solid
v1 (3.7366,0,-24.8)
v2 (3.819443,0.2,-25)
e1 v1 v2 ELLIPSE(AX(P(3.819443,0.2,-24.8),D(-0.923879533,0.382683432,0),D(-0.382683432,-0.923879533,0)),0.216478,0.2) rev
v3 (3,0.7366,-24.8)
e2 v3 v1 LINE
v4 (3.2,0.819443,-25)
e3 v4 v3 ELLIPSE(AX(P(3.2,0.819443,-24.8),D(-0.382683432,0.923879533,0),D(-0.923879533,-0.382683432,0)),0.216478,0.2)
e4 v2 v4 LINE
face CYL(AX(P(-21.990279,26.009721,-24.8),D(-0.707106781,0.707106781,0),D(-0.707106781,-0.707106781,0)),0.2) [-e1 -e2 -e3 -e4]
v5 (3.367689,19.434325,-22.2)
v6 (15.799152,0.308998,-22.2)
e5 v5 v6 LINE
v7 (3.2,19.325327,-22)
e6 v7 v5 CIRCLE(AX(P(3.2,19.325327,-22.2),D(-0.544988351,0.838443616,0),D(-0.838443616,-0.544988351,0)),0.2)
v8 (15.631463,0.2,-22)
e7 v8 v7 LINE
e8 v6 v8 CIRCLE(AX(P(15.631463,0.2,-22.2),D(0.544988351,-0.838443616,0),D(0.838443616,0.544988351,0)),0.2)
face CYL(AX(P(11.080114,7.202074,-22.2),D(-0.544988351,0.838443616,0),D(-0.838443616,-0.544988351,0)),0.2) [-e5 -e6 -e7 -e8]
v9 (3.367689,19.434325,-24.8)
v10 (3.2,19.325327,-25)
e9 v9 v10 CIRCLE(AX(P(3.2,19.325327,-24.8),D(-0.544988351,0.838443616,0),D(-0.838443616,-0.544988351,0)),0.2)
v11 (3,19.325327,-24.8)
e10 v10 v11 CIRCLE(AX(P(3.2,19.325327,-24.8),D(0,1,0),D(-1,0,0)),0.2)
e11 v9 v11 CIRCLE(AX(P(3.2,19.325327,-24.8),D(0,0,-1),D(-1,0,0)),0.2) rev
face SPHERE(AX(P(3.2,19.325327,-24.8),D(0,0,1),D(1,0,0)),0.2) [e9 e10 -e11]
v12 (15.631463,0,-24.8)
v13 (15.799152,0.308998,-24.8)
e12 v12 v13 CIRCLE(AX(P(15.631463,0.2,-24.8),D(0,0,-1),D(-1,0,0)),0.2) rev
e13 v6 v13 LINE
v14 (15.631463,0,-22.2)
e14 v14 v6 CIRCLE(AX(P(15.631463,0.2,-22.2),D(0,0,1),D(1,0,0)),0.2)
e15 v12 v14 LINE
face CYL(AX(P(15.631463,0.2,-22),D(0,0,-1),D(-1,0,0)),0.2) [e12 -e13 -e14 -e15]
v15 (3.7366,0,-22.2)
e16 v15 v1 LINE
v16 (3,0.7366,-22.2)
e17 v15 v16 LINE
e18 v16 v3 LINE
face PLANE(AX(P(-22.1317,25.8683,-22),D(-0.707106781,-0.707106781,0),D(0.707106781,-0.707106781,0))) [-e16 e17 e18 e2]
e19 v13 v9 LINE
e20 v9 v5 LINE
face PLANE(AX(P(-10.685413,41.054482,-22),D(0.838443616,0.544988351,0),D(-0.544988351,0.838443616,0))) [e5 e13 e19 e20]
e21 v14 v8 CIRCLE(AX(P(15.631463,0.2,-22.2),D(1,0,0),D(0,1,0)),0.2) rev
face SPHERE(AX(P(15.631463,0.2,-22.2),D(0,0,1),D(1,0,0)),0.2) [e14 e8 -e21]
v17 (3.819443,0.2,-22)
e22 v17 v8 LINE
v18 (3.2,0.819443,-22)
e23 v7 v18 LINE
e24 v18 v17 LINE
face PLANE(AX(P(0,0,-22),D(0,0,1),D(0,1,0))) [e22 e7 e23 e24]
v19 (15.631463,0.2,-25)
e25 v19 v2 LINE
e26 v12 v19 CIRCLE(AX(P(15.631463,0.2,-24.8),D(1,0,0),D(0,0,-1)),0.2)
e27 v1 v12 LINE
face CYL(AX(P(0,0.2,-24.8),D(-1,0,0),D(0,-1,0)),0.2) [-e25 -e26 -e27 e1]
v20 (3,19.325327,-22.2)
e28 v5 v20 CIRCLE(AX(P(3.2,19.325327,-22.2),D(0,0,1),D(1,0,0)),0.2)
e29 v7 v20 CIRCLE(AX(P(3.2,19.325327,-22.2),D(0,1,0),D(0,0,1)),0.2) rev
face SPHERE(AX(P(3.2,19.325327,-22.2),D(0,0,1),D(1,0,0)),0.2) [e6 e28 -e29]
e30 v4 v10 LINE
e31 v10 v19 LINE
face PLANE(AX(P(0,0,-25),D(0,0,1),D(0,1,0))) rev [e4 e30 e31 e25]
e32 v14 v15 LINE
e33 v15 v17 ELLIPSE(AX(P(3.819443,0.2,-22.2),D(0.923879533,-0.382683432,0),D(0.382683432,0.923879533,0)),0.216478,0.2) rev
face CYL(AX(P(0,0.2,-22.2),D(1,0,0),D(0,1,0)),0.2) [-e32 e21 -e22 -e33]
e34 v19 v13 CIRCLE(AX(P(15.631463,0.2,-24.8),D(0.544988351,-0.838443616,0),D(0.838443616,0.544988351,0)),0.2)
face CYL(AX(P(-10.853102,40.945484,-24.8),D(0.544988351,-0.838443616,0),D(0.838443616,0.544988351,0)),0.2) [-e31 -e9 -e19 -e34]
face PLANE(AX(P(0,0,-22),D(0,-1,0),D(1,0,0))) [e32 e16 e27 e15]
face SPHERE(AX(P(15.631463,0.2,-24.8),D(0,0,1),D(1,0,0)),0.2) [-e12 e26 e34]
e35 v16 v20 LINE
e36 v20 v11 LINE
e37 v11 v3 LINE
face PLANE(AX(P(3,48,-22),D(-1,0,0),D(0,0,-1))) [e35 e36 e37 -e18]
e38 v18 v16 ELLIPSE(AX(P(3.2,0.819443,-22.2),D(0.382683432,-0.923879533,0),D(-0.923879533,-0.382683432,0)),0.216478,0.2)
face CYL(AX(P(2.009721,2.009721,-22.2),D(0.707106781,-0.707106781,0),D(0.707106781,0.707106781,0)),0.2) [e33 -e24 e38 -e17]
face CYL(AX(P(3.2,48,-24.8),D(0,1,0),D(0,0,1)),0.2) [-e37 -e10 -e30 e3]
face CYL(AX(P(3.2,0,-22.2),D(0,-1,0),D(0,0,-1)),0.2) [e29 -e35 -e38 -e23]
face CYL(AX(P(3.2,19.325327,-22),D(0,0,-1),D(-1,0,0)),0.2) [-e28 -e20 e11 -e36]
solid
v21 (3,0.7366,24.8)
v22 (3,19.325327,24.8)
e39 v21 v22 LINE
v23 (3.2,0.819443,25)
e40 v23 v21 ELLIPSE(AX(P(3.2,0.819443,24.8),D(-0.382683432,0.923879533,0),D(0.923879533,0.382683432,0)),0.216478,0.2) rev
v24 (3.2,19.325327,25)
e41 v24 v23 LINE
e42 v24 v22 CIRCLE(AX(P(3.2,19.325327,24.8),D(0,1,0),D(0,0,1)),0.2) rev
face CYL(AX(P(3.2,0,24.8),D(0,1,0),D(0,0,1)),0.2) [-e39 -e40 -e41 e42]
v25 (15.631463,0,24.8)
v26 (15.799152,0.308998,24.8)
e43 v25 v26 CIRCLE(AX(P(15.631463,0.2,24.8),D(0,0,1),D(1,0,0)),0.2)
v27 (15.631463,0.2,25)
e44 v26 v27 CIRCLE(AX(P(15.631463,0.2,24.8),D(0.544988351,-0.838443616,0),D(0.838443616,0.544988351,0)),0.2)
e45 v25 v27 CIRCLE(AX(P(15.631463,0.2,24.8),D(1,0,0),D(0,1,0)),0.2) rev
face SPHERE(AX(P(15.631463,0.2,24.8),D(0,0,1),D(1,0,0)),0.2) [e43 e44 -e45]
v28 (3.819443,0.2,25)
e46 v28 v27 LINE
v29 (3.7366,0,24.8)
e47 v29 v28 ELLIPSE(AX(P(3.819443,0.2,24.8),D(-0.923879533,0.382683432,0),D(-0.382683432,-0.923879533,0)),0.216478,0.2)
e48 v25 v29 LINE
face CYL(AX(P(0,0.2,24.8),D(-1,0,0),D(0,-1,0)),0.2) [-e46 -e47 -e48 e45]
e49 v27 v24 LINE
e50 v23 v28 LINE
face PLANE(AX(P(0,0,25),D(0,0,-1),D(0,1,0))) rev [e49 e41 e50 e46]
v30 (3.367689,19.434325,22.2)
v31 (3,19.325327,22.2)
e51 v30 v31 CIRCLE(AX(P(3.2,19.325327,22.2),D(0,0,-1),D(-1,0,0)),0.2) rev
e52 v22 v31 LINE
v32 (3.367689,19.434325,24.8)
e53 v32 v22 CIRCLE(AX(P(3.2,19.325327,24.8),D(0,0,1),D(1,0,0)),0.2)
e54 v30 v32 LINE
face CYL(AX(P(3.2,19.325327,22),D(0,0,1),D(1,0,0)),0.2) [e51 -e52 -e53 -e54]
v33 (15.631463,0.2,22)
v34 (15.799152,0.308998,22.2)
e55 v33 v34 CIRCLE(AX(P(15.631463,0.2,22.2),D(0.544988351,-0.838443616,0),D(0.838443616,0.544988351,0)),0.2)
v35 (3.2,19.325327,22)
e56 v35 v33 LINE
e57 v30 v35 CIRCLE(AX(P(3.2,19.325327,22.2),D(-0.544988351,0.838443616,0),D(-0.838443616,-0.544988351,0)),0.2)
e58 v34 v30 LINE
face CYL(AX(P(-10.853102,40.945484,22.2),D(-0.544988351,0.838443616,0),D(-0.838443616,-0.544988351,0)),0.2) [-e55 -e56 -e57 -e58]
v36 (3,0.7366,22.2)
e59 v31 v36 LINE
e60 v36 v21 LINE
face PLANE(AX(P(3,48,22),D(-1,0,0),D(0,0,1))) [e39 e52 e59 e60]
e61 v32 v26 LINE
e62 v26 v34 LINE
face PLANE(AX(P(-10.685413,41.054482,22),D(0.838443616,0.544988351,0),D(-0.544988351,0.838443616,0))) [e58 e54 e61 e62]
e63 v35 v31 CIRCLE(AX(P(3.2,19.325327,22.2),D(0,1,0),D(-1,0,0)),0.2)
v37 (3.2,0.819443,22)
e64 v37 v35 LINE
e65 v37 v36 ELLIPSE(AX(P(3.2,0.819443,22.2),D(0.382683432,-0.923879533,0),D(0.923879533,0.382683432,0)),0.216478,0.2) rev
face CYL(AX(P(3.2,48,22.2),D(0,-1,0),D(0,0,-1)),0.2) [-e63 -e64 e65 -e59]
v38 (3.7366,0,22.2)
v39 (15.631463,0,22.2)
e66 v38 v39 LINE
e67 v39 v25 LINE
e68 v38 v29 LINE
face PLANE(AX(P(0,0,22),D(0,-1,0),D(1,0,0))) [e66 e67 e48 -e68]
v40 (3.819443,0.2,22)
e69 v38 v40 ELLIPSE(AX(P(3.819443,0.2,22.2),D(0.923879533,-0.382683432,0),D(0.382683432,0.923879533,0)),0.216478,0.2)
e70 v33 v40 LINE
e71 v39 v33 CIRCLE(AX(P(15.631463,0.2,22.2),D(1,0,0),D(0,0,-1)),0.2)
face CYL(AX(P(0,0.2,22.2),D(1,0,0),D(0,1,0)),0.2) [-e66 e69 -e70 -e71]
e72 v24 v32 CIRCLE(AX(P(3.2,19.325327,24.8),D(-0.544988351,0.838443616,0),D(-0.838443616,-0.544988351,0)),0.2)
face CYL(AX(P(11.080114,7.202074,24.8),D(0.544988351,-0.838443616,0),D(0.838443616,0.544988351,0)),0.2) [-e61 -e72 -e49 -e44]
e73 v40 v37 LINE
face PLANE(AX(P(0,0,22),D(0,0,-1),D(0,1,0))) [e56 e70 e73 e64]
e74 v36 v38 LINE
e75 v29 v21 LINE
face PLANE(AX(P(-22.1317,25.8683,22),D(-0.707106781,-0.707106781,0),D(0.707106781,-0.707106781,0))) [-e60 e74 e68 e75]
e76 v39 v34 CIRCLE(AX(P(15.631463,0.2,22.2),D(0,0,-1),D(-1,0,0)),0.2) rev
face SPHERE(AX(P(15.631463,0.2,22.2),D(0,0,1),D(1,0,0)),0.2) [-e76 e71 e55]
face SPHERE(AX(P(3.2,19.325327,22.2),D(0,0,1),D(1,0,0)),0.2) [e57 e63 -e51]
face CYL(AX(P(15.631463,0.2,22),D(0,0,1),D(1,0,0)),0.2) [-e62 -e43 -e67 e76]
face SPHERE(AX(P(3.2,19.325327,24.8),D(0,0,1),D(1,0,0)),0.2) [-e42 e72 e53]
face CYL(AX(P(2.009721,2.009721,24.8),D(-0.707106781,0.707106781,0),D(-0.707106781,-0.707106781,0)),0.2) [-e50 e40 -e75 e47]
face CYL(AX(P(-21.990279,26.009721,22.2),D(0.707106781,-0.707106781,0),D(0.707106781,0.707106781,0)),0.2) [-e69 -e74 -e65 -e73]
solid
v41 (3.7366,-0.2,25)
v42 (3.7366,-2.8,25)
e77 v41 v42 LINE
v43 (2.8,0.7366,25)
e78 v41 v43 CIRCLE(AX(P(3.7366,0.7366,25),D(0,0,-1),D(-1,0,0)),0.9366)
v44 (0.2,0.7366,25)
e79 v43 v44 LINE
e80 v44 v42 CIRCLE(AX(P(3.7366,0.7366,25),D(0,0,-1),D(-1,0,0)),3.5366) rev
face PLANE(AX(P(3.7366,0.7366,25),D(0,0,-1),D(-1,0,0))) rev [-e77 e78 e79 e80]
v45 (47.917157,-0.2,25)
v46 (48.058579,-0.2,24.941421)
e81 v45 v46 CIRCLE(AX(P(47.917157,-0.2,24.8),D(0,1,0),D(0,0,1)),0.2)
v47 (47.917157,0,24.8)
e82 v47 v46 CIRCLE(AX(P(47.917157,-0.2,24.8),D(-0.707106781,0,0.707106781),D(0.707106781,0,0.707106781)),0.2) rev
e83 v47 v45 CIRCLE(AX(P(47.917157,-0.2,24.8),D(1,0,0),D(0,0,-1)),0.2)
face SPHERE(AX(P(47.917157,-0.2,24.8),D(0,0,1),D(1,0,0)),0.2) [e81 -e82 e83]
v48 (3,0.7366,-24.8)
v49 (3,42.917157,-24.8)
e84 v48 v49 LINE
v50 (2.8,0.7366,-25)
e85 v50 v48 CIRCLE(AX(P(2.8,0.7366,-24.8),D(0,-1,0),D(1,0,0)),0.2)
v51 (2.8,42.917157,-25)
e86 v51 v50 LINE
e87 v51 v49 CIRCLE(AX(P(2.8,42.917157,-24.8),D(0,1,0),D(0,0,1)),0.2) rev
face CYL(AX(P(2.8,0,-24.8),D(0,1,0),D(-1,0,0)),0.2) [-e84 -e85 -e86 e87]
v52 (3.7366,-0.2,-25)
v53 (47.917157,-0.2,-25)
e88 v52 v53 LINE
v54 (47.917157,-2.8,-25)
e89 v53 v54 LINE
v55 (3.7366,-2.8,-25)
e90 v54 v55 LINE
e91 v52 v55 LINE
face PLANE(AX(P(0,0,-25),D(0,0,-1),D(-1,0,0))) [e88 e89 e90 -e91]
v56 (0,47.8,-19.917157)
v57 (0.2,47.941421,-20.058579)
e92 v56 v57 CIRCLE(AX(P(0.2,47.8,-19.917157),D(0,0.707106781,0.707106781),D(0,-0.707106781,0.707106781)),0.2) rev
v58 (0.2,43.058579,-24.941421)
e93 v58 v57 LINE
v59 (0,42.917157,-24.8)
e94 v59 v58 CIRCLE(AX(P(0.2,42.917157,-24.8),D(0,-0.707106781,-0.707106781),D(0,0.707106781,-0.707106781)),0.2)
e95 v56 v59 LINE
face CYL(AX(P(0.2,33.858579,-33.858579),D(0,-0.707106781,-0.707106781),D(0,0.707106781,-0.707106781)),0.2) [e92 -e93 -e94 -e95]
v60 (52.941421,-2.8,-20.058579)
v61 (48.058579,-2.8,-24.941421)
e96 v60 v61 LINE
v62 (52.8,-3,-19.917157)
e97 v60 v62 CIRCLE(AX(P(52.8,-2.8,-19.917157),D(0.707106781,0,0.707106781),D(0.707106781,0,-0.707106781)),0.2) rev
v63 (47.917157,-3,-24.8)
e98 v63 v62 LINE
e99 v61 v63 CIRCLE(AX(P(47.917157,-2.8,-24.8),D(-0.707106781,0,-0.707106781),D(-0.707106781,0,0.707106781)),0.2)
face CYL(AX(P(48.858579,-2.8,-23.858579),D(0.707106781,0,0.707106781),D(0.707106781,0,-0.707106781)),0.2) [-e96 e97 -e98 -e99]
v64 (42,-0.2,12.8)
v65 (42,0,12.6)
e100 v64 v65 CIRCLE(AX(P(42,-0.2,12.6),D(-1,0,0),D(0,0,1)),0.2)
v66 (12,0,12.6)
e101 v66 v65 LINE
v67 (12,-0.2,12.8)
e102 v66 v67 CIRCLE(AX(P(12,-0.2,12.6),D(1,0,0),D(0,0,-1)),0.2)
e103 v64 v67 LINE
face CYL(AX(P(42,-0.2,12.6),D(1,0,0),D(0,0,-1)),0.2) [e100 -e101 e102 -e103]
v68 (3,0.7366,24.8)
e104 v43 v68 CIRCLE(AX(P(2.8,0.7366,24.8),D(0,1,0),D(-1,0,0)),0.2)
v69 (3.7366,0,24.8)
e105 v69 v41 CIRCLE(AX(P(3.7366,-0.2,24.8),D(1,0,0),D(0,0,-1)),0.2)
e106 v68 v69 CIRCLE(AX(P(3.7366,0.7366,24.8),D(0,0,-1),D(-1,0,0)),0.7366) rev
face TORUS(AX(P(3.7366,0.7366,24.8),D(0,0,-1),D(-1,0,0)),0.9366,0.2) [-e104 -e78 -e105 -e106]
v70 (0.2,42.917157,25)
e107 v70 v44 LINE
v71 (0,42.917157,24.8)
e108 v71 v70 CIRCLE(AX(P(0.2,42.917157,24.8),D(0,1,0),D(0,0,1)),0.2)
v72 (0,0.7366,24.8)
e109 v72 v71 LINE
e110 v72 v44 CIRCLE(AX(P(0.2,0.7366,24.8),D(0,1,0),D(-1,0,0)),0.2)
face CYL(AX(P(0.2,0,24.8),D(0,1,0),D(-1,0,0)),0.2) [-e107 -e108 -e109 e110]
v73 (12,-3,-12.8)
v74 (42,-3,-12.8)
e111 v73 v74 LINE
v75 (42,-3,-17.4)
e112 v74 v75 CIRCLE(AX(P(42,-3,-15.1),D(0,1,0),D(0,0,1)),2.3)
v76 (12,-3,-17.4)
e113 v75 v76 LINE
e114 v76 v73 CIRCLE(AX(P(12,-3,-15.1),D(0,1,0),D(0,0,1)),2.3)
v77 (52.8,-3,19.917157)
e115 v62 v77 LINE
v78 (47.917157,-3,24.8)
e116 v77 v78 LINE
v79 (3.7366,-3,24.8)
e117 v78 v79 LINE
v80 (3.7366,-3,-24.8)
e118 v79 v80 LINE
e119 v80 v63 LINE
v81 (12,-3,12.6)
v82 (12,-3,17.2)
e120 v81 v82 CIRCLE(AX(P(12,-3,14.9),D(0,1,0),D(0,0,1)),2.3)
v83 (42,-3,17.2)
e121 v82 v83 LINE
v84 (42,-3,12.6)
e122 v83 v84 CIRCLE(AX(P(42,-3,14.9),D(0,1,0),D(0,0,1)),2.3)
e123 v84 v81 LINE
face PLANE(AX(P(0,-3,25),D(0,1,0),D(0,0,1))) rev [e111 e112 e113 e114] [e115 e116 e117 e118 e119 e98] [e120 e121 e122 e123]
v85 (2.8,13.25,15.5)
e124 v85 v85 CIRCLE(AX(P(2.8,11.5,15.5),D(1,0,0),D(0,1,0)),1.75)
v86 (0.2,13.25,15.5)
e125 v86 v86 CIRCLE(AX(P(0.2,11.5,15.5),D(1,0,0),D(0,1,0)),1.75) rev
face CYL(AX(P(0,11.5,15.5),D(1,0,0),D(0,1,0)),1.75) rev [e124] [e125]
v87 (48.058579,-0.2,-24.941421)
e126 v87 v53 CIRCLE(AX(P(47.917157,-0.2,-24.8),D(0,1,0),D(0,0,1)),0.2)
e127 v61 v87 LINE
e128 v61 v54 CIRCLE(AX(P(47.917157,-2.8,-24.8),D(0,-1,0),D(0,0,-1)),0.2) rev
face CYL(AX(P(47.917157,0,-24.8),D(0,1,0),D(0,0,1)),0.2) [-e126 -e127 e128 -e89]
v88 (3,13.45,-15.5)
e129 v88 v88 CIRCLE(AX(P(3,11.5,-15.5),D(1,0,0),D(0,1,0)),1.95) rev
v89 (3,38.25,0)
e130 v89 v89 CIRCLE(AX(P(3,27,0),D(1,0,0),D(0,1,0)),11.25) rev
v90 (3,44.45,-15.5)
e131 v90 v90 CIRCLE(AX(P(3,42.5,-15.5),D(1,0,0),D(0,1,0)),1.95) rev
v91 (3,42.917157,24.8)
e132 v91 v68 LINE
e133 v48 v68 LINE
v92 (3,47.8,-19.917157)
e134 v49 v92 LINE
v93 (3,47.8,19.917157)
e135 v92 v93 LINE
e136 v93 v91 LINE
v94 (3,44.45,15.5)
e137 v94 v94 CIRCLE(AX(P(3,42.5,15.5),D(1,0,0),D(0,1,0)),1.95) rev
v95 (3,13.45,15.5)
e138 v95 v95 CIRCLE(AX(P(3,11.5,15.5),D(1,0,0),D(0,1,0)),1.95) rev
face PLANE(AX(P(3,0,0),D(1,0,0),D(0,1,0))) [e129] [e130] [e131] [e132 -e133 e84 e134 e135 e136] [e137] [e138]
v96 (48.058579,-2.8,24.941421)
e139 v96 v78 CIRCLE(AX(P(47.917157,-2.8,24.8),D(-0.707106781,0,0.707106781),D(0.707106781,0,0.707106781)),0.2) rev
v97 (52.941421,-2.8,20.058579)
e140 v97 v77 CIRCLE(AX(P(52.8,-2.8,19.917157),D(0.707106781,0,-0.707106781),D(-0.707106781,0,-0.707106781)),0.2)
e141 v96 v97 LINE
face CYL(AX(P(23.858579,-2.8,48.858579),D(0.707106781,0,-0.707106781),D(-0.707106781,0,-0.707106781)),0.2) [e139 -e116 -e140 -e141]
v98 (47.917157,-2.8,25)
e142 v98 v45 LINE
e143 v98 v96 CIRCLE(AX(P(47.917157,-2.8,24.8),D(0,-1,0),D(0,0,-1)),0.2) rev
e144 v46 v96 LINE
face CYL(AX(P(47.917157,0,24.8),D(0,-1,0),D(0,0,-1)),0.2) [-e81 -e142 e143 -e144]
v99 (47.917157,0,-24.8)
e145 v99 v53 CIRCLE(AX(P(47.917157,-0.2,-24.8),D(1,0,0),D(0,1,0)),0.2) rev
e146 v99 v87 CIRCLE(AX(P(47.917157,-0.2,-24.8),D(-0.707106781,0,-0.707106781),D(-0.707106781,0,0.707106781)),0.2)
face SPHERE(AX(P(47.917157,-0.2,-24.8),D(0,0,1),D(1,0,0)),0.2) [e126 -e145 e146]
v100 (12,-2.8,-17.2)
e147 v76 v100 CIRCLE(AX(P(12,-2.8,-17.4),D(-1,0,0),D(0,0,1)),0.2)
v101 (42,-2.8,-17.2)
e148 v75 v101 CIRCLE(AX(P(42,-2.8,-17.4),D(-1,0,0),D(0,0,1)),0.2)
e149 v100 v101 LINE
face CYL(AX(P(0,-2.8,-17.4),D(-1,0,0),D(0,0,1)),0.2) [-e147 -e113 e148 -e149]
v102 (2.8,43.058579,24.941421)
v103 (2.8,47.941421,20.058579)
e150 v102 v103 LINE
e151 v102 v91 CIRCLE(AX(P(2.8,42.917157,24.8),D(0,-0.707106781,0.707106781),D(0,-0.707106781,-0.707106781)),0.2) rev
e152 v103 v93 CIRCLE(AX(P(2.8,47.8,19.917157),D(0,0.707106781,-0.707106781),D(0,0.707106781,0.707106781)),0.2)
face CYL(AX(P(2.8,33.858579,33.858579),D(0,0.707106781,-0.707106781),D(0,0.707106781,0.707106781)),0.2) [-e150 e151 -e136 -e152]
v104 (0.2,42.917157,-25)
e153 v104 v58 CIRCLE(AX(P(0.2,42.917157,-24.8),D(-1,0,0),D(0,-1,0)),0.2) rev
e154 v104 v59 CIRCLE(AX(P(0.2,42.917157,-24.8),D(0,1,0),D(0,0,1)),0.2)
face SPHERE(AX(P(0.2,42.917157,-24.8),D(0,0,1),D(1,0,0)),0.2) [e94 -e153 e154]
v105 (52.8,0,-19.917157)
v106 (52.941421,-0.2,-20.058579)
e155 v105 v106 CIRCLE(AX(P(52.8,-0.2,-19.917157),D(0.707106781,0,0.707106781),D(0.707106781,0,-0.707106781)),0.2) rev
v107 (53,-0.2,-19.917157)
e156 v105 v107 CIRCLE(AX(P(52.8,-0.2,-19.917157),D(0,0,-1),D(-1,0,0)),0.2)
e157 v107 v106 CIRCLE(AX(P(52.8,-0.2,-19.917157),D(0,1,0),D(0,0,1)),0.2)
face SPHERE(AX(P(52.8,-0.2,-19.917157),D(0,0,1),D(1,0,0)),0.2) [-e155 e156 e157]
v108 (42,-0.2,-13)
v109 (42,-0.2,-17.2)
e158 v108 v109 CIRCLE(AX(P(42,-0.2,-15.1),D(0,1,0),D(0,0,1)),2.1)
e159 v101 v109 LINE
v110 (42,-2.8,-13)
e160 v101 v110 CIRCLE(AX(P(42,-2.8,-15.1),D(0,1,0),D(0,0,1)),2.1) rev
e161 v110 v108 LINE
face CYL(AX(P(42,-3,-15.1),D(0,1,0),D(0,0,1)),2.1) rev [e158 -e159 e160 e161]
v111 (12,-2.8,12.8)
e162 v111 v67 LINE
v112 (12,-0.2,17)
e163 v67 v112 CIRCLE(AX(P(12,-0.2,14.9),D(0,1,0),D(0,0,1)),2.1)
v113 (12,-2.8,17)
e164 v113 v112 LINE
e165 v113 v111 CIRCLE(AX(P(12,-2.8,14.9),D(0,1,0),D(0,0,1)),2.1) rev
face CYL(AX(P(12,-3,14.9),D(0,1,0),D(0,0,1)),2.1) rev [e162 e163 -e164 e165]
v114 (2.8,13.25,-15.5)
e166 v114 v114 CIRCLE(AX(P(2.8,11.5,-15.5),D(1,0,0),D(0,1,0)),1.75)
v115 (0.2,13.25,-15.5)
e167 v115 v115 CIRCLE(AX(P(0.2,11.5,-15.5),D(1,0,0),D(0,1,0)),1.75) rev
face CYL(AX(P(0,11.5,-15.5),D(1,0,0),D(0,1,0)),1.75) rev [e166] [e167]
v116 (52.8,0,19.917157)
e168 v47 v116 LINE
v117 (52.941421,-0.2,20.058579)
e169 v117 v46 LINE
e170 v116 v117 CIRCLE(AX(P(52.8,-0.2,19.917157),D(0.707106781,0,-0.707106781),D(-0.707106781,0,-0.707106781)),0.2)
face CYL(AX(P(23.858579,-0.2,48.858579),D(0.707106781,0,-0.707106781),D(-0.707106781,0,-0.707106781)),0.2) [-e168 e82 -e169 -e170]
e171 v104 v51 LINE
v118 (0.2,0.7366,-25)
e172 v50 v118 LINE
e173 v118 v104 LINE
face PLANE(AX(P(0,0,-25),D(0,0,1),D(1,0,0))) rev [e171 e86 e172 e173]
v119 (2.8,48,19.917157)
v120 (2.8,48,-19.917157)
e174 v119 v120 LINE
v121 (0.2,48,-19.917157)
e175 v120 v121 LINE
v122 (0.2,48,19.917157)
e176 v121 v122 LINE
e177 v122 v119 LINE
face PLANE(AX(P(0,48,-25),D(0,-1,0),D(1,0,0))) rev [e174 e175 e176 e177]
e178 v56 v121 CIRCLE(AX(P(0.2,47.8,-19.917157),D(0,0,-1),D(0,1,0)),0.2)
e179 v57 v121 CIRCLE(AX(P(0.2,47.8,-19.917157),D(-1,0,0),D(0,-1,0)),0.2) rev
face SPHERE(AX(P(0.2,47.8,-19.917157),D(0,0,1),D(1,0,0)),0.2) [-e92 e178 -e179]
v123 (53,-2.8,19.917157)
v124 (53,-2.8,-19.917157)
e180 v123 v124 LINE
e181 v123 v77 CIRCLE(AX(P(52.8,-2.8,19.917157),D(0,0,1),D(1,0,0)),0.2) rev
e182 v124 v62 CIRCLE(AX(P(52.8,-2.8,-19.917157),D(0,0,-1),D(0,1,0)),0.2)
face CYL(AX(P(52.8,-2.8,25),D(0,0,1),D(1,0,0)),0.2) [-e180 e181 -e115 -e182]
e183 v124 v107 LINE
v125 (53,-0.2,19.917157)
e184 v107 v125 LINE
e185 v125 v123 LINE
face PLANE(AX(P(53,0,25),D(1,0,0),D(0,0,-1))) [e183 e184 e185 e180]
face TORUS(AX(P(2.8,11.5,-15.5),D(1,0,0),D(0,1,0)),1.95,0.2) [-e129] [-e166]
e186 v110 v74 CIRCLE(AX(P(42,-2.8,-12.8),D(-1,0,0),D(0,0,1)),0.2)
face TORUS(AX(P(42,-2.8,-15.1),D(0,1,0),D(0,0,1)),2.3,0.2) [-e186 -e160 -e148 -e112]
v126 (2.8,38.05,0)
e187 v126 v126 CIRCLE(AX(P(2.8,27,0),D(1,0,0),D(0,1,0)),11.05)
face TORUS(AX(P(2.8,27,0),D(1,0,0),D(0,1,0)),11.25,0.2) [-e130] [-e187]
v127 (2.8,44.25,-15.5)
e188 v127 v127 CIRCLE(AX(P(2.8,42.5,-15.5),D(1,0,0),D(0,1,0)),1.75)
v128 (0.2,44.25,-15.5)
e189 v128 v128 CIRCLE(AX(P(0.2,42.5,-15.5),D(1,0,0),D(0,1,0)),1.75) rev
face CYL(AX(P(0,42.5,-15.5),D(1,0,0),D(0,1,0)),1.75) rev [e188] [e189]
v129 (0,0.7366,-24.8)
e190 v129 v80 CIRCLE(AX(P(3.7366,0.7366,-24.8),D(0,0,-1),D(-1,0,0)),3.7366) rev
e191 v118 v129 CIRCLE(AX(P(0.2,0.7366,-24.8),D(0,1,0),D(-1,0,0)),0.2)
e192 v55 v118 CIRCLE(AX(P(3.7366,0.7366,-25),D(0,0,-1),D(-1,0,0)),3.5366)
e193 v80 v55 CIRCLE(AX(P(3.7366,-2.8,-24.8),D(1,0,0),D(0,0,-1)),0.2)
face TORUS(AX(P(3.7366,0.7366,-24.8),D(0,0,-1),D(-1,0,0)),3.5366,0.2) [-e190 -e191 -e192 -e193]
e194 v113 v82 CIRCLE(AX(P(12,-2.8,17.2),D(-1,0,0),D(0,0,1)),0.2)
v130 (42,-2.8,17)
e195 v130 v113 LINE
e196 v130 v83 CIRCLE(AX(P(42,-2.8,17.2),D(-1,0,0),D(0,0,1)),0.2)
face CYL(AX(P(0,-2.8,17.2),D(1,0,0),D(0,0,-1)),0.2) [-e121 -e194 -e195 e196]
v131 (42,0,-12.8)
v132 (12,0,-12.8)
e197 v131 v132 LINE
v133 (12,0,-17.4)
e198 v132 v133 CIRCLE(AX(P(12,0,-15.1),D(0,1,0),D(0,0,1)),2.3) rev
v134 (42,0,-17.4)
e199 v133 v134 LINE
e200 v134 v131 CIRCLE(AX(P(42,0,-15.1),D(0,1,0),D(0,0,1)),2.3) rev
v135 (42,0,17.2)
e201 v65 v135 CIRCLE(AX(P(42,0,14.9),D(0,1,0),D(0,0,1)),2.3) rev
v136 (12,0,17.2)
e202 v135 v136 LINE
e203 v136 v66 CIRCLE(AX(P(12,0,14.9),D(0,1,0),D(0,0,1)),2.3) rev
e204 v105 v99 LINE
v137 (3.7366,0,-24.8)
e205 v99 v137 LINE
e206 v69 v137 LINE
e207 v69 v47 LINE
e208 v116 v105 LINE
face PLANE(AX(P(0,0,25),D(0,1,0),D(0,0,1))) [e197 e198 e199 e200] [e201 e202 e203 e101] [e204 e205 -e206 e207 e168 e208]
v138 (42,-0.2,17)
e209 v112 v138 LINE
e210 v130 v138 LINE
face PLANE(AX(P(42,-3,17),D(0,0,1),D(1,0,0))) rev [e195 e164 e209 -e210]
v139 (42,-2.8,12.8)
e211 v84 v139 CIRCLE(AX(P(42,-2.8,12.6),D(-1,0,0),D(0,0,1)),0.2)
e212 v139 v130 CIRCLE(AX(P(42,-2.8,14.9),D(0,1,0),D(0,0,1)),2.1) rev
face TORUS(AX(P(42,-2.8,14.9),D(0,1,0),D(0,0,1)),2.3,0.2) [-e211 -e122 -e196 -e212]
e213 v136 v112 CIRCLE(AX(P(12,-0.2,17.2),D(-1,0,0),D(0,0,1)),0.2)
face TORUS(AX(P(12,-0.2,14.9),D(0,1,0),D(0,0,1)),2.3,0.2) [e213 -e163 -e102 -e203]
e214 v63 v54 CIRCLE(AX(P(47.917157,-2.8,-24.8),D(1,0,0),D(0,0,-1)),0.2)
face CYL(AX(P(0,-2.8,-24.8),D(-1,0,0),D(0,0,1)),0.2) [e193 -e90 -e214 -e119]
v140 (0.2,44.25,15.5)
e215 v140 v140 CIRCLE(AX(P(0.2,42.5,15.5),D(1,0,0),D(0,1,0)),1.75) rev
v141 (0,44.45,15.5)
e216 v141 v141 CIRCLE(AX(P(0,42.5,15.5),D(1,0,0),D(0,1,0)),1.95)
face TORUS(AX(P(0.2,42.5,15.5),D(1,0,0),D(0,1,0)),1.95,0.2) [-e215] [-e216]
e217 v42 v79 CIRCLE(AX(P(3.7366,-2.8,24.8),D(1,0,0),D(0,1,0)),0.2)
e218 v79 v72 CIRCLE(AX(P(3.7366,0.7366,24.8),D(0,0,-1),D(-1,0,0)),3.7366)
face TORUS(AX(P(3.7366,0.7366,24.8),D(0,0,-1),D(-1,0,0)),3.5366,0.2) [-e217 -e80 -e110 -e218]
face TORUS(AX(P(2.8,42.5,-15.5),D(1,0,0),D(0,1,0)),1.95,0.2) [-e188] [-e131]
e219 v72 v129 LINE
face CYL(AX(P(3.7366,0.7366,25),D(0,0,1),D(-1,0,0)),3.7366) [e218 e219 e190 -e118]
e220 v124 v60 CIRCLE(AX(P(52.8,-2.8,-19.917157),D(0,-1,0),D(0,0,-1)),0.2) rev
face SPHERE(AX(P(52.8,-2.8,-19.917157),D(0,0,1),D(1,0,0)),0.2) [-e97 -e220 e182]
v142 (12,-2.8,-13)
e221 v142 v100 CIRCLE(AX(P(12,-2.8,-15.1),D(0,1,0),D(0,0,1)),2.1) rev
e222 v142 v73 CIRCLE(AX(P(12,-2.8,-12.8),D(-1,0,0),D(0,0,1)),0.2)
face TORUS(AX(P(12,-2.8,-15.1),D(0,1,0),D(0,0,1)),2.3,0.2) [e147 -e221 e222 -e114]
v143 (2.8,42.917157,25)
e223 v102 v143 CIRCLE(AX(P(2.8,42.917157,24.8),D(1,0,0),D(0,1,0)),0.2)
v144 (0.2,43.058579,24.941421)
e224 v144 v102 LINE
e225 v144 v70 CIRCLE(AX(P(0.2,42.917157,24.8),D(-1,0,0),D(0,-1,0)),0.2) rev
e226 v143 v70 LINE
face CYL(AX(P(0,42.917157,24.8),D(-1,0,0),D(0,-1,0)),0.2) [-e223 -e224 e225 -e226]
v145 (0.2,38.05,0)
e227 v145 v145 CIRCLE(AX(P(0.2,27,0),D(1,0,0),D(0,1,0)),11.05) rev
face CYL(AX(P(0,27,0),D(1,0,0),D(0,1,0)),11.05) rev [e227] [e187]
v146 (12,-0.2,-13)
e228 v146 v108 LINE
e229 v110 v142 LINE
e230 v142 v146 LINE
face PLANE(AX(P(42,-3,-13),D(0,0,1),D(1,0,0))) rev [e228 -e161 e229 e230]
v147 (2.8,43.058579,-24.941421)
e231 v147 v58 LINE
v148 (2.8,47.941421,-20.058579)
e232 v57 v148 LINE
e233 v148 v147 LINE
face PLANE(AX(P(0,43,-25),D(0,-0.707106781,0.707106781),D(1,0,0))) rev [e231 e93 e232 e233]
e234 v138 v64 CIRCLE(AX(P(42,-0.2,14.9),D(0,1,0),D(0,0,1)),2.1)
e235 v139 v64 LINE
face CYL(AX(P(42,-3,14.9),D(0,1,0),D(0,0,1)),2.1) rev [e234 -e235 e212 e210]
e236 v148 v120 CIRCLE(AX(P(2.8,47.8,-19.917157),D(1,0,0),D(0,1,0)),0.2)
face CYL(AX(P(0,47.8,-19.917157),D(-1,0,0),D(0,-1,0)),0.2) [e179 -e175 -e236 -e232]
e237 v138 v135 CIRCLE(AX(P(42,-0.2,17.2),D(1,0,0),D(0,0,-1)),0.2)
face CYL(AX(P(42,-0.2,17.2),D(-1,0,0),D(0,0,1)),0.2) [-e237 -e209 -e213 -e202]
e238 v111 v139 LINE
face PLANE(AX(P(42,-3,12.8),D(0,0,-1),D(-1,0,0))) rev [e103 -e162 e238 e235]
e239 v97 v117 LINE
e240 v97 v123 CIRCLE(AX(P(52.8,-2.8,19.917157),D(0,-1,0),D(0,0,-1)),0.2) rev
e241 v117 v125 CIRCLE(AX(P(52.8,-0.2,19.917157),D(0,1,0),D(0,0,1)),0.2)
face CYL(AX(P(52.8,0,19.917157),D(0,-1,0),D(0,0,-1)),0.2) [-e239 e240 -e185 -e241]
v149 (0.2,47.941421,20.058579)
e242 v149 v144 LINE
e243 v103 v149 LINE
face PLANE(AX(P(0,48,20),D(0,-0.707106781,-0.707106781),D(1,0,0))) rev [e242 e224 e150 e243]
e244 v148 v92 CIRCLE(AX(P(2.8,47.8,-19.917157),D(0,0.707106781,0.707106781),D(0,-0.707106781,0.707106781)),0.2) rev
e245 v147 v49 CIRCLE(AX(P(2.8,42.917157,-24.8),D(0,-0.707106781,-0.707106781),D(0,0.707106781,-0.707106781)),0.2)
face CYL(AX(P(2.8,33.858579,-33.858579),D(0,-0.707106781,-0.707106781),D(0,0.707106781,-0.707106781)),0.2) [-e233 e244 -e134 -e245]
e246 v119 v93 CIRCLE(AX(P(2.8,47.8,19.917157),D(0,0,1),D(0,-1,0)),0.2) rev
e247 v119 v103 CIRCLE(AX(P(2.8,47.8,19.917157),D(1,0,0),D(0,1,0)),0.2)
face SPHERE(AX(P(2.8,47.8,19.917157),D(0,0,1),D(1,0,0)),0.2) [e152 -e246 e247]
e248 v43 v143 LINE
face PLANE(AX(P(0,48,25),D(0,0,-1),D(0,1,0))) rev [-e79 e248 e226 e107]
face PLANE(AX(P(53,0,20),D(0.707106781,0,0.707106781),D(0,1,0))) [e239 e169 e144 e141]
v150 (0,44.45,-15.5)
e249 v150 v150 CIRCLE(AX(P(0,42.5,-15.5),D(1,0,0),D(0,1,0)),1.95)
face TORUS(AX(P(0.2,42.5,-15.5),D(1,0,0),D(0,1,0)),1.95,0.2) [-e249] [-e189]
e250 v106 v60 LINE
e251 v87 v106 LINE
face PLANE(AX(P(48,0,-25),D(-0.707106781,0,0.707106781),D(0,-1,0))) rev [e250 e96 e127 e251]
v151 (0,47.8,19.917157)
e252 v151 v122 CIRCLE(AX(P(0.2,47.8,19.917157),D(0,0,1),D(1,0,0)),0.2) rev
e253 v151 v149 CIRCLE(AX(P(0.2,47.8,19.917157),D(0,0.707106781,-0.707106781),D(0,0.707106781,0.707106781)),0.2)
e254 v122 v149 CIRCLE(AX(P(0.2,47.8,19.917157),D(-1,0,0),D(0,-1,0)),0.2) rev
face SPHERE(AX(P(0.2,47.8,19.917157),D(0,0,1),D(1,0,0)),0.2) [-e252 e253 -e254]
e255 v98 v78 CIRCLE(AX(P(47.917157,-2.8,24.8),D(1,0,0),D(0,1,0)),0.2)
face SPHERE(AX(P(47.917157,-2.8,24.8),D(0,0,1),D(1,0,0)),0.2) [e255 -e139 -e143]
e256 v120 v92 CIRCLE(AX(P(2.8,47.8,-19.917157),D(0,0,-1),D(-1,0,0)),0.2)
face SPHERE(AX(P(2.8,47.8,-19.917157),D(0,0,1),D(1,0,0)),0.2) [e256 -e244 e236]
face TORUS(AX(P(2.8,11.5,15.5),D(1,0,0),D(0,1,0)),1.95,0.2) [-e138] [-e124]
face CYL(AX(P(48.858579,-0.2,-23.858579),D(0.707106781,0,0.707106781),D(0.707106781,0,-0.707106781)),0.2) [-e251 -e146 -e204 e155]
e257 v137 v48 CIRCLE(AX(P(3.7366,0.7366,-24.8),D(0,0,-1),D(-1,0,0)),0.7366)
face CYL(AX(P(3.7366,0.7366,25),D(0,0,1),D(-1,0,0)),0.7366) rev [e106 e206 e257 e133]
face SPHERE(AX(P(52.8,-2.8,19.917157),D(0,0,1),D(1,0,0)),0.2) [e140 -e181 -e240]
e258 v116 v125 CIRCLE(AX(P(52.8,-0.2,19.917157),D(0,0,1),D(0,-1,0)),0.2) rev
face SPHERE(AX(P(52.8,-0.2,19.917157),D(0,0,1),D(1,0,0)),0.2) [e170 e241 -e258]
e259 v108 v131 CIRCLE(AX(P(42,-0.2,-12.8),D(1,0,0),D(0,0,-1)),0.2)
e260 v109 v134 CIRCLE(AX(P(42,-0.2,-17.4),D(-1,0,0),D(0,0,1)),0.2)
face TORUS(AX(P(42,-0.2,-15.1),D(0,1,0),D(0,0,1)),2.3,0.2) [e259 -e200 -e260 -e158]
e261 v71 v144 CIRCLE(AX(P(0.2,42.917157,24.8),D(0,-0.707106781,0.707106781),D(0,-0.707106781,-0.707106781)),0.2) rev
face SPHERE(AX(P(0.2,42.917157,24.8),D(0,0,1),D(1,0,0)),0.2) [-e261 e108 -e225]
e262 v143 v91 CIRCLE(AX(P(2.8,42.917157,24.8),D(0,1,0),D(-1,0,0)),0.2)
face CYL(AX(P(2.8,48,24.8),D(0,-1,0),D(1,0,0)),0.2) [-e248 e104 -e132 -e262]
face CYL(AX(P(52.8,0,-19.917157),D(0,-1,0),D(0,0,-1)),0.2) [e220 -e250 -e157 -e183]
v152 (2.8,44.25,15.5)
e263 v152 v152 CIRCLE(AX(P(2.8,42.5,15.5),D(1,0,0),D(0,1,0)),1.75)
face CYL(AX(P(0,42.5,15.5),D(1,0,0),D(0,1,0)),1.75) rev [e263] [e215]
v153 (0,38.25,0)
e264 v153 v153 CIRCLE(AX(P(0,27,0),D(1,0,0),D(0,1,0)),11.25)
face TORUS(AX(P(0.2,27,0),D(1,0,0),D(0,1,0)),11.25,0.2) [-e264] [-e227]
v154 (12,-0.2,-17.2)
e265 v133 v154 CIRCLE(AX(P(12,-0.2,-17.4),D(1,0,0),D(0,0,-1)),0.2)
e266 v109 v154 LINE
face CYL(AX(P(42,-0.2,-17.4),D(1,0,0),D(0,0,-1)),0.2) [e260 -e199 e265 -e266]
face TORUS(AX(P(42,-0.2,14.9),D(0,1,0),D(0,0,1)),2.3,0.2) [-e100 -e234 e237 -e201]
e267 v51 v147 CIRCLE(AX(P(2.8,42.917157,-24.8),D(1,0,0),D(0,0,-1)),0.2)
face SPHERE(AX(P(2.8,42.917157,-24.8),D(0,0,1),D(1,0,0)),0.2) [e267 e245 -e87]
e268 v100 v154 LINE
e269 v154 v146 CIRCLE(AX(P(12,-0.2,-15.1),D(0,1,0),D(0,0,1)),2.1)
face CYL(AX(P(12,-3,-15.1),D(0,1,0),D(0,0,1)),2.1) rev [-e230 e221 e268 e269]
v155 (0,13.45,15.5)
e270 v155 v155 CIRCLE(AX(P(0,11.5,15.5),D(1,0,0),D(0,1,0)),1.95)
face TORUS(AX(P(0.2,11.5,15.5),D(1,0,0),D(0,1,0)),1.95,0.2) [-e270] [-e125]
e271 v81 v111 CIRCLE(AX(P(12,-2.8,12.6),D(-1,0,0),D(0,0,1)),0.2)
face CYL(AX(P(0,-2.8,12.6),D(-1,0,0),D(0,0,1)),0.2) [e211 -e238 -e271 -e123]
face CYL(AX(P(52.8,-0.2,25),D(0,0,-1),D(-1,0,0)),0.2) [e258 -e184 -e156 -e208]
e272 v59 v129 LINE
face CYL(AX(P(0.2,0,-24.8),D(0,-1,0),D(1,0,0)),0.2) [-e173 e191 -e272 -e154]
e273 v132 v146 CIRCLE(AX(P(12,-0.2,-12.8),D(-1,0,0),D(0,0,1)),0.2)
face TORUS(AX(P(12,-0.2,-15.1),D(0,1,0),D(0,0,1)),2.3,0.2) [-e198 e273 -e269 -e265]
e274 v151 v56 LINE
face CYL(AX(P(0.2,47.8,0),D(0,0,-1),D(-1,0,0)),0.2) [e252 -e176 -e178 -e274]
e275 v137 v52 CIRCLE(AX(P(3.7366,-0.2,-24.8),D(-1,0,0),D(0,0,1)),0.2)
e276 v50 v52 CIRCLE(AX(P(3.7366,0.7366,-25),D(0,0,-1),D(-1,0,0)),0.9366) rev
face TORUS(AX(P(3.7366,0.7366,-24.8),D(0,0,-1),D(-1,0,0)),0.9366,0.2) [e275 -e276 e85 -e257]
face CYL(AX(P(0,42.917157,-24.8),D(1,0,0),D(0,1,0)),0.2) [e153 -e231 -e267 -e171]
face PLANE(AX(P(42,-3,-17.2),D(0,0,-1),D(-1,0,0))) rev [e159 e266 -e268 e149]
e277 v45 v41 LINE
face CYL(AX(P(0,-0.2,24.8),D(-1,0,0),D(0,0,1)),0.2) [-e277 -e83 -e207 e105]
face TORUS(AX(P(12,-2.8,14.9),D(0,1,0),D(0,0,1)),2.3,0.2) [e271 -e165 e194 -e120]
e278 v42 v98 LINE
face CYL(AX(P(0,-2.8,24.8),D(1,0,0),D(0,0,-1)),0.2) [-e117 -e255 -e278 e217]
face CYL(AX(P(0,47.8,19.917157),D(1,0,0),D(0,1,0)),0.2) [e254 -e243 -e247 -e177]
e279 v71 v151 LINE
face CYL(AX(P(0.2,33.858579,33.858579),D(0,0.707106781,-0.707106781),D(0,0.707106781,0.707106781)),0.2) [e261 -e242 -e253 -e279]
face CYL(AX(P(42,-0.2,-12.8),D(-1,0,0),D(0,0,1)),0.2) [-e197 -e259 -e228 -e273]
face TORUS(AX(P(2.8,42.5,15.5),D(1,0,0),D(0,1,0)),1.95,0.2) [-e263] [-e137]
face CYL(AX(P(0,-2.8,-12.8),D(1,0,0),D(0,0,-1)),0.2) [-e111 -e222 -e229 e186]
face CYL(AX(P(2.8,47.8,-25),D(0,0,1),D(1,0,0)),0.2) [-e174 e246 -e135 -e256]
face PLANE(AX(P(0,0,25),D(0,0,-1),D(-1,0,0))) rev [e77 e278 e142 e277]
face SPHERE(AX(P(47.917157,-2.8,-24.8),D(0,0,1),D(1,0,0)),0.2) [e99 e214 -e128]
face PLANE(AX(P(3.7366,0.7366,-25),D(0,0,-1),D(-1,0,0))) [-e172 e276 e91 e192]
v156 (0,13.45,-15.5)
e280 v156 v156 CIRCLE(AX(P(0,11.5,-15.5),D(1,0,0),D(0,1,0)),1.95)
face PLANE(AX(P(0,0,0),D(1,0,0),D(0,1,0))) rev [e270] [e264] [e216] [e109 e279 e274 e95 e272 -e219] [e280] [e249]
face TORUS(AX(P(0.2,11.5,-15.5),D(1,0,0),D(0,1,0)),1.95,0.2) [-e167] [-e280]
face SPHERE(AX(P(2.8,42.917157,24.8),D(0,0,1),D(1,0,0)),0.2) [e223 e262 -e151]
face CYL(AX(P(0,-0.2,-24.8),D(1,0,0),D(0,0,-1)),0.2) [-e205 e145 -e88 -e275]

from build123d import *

# Parameters (mm, degrees)
SCHIZZO1_W                     = 53
SCHIZZO1_H                     = 3
BASE_FLANGIA1_DEPTH            = 25
BORDO_FLANGIA1_STRIP_W         = 13.4732
BORDO_FLANGIA1_STRIP_H         = 3
BORDO_FLANGIA1_STRIP_CUT_DEPTH = 50
BORDO_FLANGIA1_DEPTH           = 50
SCHIZZO10_R                    = 11.05
SCHIZZO10_R_2                  = 1.75
TAGLIO_ESTRUSIONE1_DEPTH       = 74.681748079
TAGLIO_ESTRUSIONE3_DEPTH       = 76.749587458
ESTRUSIONE_ESTRUSIONE3_START   = 25
ESTRUSIONE_ESTRUSIONE3_DEPTH   = 3
SMUSSO1_SIZE                   = 5
RACCORDO1_R                    = 0.2
RACCORDO2_R                    = 0.2
RACCORDO3_R                    = 0.2


# Sheet-metal steps are written as plain solids
with BuildPart() as part:
    # Schizzo1 → Base-Flangia1 (new, symmetric)
    with BuildSketch(Plane.XY):
        with Locations((26.5, -1.5)):
            Rectangle(SCHIZZO1_W, SCHIZZO1_H)
    extrude(amount=BASE_FLANGIA1_DEPTH, both=True)

    # Bordo-Flangia1 strip (across the edge) → Bordo-Flangia1 strip cut (cut)
    with BuildSketch(Plane.XY.offset(-25)):
        with Locations((-3, -1.5)):
            Rectangle(BORDO_FLANGIA1_STRIP_W, BORDO_FLANGIA1_STRIP_H)
    extrude(amount=BORDO_FLANGIA1_STRIP_CUT_DEPTH, mode=Mode.SUBTRACT)

    # Bordo-Flangia1 section (across the edge) → Bordo-Flangia1 (add)
    with BuildSketch(Plane.XY.offset(-25)):
        with BuildLine():
            Line((0, 0.7366), (0, 48))
            Line((0, 48), (3, 48))
            Line((3, 48), (3, 0.7366))
            ThreePointArc((3, 0.7366), (3.215745145, 0.215745145), (3.7366, 0))
            Line((3.7366, 0), (3.7366, -3))
            ThreePointArc((3.7366, -3), (1.094424801, -1.905575199), (0, 0.7366))
        make_face()
    extrude(amount=BORDO_FLANGIA1_DEPTH)

    # Schizzo10 → Taglio-Estrusione1 (cut, through all)
    with BuildSketch(Plane(origin=(3, 0, 0), x_dir=(0, 0, -1), z_dir=(1, 0, 0))):
        with Locations(Location((0, 27, 0), (0, 0, 90))):
            Circle(SCHIZZO10_R)
        with Locations(Location((-15.5, 42.5, 0), (0, 0, 90))):
            Circle(SCHIZZO10_R_2)
        with Locations(Location((15.5, 42.5, 0), (0, 0, 270))):
            Circle(SCHIZZO10_R_2)
        with Locations(Location((-15.5, 11.5, 0), (0, 0, 270))):
            Circle(SCHIZZO10_R_2)
        with Locations(Location((15.5, 11.5, 0), (0, 0, 90))):
            Circle(SCHIZZO10_R_2)
    extrude(amount=-TAGLIO_ESTRUSIONE1_DEPTH, mode=Mode.SUBTRACT)

    # Schizzo12 → Taglio-Estrusione3 (cut, through all)
    with BuildSketch(Plane(origin=(0, 0, 0), x_dir=(1, 0, 0), z_dir=(0, 1, 0))):
        with BuildLine():
            Line((42, 13), (12, 13))
            ThreePointArc((12, 13), (9.9, 15.1), (12, 17.2))
            Line((12, 17.2), (42, 17.2))
            ThreePointArc((42, 17.2), (44.1, 15.1), (42, 13))
        make_face()
        with BuildLine():
            Line((42, -17), (12, -17))
            ThreePointArc((12, -17), (9.9, -14.9), (12, -12.8))
            Line((12, -12.8), (42, -12.8))
            ThreePointArc((42, -12.8), (44.1, -14.9), (42, -17))
        make_face()
    extrude(amount=-TAGLIO_ESTRUSIONE3_DEPTH, mode=Mode.SUBTRACT)

    # Smusso1
    smusso1_edges = [part.edges().sort_by_distance(p)[0] for p in [
        (1.5, 48, -25),
        (1.5, 48, 25),
        (53, -1.5, -25),
        (53, -1.5, 25),
    ]]
    chamfer(smusso1_edges, length=SMUSSO1_SIZE)

    # Raccordo1
    raccordo1_edges = [part.edges().sort_by_distance(p)[0] for p in [
        (53, 0, 0),
        (53, -3, 0),
        (53, -1.5, -20),
        (53, -1.5, 20),
        (50.5, -3, -22.5),
        (50.5, -3, 22.5),
        (48, -1.5, 25),
        (50.5, 0, -22.5),
        (50.5, 0, 22.5),
        (48, -1.5, -25),
        (0, 21.8683, -25),
        (3, 21.8683, -25),
        (1.5, 43, -25),
        (3, 48, 0),
        (25.8683, -3, -25),
        (3, 45.5, 22.5),
        (3, 45.5, -22.5),
        (0, 48, 0),
        (1.5, 48, 20),
        (1.5, 48, -20),
        (25.8683, 0, -25),
        (0, 45.5, 22.5),
        (0, 45.5, -22.5),
        (1.5, 43, 25),
        (25.8683, -3, 25),
        (25.8683, 0, 25),
        (1.094424801, -1.905575199, -25),
        (1.094424801, -1.905575199, 25),
        (3.215745145, 0.215745145, -25),
        (3.215745145, 0.215745145, 25),
        (3, 21.8683, 25),
        (0, 21.8683, 25),
        (0, 9.75, -15.5),
        (3, 9.75, -15.5),
        (0, 13.25, 15.5),
        (3, 13.25, 15.5),
        (0, 44.25, -15.5),
        (3, 44.25, -15.5),
        (0, 40.75, 15.5),
        (3, 40.75, 15.5),
        (0, 15.95, 0),
        (3, 15.95, 0),
        (44.1, -3, -15.1),
        (27, -3, -13),
        (9.9, -3, -15.1),
        (27, -3, -17.2),
        (44.1, 0, -15.1),
        (27, 0, -17.2),
        (9.9, 0, -15.1),
        (27, 0, -13),
        (44.1, -3, 14.9),
        (27, -3, 17),
        (9.9, -3, 14.9),
        (27, -3, 12.8),
        (44.1, 0, 14.9),
        (27, 0, 12.8),
        (9.9, 0, 14.9),
        (27, 0, 17),
    ]]
    fillet(raccordo1_edges, radius=RACCORDO1_R)


with BuildPart() as body_2:
    # Schizzo15 → Estrusione-Estrusione3 (new body)
    with BuildSketch(Plane.XY.offset(ESTRUSIONE_ESTRUSIONE3_START)):
        Polygon((3, 20), (16, 0), (3.7366, 0), (3, 0.7366), align=None)
    extrude(amount=-ESTRUSIONE_ESTRUSIONE3_DEPTH)


with BuildPart() as body_3:
    # Specchia5: mirrored copy
    add(body_2.part.mirror(Plane.XY))

    # Raccordo2
    raccordo2_edges = [body_3.edges().sort_by_distance(p)[0] for p in [
        (3, 10.3683, -22),
        (3.3683, 0.3683, -22),
        (9.8683, 0, -22),
        (3.3683, 0.3683, -25),
        (3, 10.3683, -25),
        (9.5, 10, -25),
        (9.8683, 0, -25),
        (9.5, 10, -22),
        (3, 20, -23.5),
        (16, 0, -23.5),
    ]]
    fillet(raccordo2_edges, radius=RACCORDO2_R)


with BuildPart() as body_2_1:
    add(body_2.part)

    # Raccordo3
    raccordo3_edges = [body_2_1.edges().sort_by_distance(p)[0] for p in [
        (3, 10.3683, 22),
        (3.3683, 0.3683, 22),
        (9.8683, 0, 22),
        (3.3683, 0.3683, 25),
        (3, 10.3683, 25),
        (9.5, 10, 25),
        (9.8683, 0, 25),
        (9.5, 10, 22),
        (3, 20, 23.5),
        (16, 0, 23.5),
    ]]
    fillet(raccordo3_edges, radius=RACCORDO3_R)


solid = Compound([part.part, body_3.part, body_2_1.part])
